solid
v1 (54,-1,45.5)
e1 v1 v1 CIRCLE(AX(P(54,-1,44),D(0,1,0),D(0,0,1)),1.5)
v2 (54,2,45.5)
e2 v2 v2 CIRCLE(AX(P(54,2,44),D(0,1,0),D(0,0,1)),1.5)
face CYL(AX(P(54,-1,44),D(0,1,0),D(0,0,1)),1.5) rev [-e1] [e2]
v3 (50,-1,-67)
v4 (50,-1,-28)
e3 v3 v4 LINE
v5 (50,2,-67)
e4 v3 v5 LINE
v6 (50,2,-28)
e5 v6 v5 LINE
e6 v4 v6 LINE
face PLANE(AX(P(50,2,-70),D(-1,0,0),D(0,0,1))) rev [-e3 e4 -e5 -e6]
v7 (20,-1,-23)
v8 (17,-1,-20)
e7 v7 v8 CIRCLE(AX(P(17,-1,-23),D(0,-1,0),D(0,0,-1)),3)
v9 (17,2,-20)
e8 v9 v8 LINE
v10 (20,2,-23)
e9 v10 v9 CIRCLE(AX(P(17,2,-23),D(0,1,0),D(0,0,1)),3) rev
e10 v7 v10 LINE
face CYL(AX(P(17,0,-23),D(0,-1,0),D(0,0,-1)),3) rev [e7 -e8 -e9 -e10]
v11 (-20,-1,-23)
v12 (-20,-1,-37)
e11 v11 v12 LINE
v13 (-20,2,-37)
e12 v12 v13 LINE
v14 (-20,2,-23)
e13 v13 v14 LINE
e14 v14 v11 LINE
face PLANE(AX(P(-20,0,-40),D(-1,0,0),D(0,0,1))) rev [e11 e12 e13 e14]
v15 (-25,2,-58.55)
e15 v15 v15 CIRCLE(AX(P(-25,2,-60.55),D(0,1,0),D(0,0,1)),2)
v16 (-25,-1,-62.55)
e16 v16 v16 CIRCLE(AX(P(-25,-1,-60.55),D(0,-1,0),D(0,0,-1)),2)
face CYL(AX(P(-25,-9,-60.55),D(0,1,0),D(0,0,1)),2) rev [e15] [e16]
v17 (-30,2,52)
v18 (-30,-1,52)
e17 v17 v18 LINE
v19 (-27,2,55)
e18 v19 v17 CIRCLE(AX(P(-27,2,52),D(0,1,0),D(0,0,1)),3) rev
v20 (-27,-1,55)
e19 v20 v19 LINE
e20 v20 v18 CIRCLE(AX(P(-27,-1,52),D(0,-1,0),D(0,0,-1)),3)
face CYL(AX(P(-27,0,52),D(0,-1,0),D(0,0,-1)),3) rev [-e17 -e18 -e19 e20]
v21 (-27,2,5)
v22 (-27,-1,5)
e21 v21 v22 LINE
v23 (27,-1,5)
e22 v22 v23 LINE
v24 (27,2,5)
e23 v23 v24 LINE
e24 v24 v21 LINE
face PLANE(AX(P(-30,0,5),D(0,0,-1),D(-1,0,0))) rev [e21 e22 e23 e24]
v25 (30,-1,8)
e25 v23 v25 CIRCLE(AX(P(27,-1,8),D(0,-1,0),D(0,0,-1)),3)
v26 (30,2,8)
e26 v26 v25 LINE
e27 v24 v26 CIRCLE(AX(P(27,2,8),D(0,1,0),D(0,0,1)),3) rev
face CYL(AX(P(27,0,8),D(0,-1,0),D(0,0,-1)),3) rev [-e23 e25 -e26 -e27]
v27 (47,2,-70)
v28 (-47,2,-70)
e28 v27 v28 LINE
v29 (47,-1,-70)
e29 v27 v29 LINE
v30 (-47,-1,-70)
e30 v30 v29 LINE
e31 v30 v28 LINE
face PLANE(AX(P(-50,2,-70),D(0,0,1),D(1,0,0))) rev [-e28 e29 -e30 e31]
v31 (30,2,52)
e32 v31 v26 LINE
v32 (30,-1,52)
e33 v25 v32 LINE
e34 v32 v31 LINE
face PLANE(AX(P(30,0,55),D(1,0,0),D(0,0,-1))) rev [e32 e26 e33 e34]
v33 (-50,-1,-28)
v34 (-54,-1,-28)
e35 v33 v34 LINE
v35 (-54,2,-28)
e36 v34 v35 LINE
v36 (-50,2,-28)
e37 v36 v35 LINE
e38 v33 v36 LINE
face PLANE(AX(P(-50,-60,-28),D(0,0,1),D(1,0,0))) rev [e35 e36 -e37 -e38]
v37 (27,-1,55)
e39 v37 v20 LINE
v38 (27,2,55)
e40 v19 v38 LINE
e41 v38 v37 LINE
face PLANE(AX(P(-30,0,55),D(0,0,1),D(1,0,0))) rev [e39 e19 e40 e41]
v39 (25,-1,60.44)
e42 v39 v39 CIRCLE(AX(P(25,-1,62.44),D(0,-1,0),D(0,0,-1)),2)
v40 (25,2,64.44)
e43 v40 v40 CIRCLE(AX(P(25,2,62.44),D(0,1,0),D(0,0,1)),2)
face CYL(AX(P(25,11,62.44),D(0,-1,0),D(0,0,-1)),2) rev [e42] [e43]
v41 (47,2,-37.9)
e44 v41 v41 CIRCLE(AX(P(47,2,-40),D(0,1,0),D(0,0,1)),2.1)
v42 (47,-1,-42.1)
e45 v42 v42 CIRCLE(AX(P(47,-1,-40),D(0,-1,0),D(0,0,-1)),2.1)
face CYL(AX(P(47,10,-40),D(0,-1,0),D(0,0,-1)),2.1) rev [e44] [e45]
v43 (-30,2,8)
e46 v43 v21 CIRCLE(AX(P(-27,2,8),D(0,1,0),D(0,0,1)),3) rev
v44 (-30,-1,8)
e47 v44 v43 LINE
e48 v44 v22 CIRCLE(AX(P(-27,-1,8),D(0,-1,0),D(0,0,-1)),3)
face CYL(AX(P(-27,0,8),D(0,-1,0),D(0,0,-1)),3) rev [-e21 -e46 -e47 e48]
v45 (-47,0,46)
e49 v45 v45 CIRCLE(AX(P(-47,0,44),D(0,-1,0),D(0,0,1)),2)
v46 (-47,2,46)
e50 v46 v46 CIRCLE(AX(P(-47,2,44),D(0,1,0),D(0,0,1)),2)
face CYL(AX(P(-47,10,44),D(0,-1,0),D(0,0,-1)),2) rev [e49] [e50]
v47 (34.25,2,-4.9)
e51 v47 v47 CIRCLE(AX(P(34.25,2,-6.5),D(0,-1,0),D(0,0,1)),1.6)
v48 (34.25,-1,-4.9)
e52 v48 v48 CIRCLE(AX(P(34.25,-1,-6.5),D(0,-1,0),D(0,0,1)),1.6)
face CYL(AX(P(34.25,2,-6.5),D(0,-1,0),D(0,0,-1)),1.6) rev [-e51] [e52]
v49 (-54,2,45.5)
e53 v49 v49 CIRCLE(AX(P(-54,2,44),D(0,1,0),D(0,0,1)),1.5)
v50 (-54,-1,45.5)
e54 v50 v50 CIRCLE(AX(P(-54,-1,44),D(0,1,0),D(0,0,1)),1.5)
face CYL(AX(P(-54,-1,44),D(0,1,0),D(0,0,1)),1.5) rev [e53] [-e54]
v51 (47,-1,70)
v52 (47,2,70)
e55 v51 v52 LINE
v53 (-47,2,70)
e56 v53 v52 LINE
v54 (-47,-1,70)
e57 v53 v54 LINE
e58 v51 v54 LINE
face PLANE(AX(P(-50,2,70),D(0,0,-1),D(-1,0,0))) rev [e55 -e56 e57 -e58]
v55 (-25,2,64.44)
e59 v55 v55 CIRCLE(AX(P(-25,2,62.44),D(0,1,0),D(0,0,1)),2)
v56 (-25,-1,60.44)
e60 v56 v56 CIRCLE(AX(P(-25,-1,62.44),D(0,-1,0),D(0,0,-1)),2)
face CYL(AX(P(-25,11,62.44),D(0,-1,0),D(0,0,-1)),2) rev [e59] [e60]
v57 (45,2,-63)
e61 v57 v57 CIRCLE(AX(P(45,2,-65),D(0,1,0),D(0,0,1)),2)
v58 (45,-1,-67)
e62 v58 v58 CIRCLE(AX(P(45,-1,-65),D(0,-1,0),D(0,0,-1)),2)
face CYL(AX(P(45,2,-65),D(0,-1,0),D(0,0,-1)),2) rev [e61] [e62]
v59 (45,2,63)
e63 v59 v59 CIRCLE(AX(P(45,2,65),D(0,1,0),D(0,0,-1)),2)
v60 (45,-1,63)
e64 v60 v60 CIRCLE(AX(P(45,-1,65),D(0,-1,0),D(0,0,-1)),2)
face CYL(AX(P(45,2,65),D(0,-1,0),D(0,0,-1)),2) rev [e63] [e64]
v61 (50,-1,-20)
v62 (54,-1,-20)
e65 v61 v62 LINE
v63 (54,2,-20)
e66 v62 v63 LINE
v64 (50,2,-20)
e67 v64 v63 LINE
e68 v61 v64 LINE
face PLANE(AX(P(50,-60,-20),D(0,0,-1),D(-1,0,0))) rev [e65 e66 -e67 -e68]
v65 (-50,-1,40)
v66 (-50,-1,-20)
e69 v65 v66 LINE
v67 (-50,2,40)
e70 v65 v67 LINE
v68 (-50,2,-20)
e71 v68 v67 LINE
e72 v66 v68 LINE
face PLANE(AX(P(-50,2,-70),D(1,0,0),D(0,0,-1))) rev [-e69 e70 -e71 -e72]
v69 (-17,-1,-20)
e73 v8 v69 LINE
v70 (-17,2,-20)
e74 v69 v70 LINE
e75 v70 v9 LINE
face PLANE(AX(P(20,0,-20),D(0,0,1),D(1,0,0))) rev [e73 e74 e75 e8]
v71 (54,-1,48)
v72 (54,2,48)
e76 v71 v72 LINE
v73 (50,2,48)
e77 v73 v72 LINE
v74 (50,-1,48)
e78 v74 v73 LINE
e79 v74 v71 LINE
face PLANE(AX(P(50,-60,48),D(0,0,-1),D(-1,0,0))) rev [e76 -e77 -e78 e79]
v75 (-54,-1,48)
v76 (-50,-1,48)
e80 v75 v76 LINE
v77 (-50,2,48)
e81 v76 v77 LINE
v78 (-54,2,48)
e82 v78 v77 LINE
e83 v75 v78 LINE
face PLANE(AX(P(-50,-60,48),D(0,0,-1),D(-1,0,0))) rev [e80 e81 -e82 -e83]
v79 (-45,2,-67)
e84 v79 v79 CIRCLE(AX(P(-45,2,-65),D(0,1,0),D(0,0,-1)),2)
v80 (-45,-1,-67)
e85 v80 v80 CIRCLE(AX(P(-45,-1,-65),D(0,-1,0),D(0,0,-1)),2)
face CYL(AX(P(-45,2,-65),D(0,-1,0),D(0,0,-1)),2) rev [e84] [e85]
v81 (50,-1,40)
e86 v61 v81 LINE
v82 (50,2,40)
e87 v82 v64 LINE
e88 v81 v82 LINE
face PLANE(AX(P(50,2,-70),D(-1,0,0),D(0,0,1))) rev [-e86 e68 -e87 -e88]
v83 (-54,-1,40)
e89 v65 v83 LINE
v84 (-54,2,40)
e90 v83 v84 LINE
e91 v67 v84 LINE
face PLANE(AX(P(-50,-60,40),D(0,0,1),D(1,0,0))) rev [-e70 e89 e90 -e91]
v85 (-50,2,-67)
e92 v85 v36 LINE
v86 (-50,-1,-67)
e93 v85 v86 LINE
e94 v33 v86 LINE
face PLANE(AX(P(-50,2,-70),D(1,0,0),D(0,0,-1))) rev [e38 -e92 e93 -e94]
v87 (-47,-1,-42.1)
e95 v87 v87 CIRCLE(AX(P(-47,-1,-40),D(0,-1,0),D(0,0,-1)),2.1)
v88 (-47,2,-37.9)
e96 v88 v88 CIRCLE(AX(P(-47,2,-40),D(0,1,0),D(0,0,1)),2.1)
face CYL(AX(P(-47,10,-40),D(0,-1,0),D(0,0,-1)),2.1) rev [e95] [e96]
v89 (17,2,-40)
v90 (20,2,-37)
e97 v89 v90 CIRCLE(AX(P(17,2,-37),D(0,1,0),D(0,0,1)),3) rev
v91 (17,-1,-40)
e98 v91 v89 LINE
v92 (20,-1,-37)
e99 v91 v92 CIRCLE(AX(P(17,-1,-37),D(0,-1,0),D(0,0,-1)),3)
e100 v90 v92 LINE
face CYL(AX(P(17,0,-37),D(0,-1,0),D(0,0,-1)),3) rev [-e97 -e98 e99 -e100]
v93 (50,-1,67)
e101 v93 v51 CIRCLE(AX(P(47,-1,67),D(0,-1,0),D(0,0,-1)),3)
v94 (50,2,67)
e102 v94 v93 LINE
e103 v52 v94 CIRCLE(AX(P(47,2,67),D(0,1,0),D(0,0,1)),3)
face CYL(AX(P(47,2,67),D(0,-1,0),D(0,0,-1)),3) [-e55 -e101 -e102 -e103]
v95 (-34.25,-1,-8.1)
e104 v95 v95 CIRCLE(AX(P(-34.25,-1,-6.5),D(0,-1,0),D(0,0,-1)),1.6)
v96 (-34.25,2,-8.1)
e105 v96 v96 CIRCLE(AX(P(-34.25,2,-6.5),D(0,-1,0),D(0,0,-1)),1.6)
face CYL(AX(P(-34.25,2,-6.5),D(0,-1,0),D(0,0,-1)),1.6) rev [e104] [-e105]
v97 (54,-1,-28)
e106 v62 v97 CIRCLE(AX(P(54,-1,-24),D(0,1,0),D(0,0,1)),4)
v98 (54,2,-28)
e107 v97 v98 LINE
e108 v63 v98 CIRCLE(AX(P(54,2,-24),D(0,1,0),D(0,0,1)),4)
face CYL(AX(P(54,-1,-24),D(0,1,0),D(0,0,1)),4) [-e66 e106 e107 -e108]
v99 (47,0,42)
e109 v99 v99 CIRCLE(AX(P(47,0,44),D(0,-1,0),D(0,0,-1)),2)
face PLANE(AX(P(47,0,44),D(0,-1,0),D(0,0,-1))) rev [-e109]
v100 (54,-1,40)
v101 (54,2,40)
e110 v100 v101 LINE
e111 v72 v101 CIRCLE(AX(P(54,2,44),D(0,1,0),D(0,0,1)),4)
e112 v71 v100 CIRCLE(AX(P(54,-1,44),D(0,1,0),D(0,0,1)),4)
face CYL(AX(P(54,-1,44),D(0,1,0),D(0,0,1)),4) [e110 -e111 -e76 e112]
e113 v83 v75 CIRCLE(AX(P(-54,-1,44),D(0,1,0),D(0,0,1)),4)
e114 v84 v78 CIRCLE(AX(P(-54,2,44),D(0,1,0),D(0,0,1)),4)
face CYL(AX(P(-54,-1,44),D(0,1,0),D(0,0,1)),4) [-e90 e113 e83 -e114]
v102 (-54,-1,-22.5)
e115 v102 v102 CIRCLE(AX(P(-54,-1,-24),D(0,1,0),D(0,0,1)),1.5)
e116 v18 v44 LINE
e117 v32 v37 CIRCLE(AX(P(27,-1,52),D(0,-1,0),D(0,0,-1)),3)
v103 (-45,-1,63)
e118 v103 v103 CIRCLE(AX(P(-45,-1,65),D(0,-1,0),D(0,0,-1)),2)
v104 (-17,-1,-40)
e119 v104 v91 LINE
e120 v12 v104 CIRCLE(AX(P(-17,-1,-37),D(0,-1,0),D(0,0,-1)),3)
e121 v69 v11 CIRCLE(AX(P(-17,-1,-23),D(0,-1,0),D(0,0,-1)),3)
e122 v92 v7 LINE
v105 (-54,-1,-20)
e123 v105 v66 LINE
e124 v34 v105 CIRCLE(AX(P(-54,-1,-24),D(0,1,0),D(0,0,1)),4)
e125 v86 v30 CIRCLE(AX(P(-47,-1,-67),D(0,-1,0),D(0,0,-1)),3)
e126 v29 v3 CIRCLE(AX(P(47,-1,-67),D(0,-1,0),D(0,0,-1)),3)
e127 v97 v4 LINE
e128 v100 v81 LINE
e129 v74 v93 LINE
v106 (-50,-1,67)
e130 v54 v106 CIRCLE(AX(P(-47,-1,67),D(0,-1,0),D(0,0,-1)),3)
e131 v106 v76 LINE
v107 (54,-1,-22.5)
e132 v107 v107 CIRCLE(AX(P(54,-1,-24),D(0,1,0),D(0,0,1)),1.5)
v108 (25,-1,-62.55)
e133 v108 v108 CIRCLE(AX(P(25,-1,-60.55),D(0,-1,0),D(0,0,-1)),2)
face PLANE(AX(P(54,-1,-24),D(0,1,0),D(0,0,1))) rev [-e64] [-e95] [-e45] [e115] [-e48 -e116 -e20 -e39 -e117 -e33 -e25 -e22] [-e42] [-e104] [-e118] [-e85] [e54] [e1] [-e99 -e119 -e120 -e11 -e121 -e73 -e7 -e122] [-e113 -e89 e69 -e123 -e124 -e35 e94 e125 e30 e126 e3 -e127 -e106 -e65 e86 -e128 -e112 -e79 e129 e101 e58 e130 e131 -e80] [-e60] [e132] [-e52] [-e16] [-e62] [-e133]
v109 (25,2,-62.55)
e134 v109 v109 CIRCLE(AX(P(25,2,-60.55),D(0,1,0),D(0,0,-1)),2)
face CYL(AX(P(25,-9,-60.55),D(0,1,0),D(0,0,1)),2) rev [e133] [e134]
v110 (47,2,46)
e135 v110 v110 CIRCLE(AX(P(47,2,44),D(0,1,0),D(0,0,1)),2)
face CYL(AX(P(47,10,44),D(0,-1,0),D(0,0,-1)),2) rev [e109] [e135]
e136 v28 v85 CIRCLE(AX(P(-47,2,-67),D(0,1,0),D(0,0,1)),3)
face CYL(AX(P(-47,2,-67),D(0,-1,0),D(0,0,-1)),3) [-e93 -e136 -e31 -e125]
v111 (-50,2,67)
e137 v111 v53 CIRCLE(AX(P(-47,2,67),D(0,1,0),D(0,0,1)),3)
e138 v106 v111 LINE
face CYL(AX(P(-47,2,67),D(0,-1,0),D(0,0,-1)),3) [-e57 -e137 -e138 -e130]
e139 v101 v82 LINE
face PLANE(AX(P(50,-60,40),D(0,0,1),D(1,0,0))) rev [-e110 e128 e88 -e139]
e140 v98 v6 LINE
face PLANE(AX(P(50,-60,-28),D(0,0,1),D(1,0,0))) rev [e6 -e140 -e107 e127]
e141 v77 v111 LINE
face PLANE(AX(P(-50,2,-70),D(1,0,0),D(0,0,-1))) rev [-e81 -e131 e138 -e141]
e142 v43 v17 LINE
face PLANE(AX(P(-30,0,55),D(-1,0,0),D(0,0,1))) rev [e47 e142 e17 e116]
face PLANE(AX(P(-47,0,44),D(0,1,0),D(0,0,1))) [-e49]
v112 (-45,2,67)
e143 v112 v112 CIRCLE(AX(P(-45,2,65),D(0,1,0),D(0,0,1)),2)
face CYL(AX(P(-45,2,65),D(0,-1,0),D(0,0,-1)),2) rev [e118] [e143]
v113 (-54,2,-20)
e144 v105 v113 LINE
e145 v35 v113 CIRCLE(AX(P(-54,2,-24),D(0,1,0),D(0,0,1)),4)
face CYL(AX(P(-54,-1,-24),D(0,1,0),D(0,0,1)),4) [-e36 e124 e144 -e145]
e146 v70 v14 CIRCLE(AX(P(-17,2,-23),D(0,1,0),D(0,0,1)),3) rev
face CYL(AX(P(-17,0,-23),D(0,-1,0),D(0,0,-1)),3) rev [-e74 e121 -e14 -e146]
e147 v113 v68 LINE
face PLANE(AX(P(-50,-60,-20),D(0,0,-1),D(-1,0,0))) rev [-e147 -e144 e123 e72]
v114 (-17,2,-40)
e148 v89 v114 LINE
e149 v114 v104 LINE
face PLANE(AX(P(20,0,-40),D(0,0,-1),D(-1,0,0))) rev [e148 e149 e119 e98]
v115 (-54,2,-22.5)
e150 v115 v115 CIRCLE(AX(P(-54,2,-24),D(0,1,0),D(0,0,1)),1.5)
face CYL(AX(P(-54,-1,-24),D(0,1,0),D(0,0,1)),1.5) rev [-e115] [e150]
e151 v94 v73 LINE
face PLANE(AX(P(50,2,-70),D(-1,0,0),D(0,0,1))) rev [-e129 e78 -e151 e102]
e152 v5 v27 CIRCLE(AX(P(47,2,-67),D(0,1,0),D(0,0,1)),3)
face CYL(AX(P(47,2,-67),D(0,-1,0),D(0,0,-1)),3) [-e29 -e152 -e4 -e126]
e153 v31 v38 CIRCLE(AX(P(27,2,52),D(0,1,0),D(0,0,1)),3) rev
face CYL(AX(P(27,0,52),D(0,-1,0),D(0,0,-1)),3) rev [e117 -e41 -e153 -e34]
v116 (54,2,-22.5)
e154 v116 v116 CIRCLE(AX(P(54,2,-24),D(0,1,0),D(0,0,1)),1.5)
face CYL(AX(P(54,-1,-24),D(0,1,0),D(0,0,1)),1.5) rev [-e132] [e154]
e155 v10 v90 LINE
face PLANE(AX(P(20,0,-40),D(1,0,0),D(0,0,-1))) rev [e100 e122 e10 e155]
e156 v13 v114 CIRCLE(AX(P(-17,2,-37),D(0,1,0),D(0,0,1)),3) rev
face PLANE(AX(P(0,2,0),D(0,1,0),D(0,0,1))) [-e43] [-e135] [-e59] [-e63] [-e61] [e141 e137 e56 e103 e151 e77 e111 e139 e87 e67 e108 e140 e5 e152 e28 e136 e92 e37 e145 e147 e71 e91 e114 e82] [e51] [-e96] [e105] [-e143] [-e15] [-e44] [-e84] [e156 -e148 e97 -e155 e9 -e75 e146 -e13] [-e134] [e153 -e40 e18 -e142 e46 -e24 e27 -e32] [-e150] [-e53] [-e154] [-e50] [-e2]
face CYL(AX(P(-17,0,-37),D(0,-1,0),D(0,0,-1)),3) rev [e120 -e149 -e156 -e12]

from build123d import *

# Parameters (mm, degrees)
SKETCH1_W                = 100
SKETCH1_H                = 140
SKETCH1_R                = 2
EXTRUDE1_DEPTH           = 2
SKETCH2_W                = 60
SKETCH2_H                = 50
EXTRUDE2_DEPTH           = 87.046499057
SKETCH3_W                = 40
SKETCH3_H                = 20
EXTRUDE3_DEPTH           = 87.046499057
FILLET1_R                = 3
SKETCH4_W                = 6
SKETCH4_H                = 8
EXTRUDE4_DEPTH           = 60
SKETCH5_R                = 1
EXTRUDE5_DEPTH           = 8
SKETCH6_R                = 2
SKETCH6_R_2              = 2.1
EXTRUDE6_DEPTH           = 10
EXTRUDE_START            = -3
SKETCH_3_R               = 1.5
EXTRUDE_1_DEPTH          = 3
CUT_EXTRUDE_3_DEPTH      = 29
CUT_EXTRUDE_3_DEPTH_BACK = 134
SKETCH_4_W               = 103.957976386
SKETCH_4_H               = 74.150098407
SKETCH_6_R               = 2
CUT_EXTRUDE_4_DEPTH      = 11
SKETCH_8_R               = 2
CUT_EXTRUDE_6_DEPTH      = 11
EXTRUDE_START_2          = 1
SKETCH_9_R               = 2
SKETCH_9_R_2             = 2.1
EXTRUDE_2_DEPTH          = 1
SKETCH_10_R              = 1.6
CUT_EXTRUDE_7_DEPTH      = 3


with BuildPart() as part:
    # Sketch1 → Extrude1 (new body)
    with BuildSketch(Plane(origin=(0, 0, 0), x_dir=(1, 0, 0), z_dir=(0, 1, 0))):
        Rectangle(SKETCH1_W, SKETCH1_H)
        with Locations((45, 65)):
            Circle(SKETCH1_R, mode=Mode.SUBTRACT)
        with Locations((-45, 65)):
            Circle(SKETCH1_R, mode=Mode.SUBTRACT)
        with Locations((-45, -65)):
            Circle(SKETCH1_R, mode=Mode.SUBTRACT)
        with Locations((45, -65)):
            Circle(SKETCH1_R, mode=Mode.SUBTRACT)
    extrude(amount=EXTRUDE1_DEPTH)

    # Sketch2 → Extrude2 (cut, through all)
    with BuildSketch(Plane(origin=(0, 2, 0), x_dir=(1, 0, 0), z_dir=(0, 1, 0))):
        with Locations((0, -30)):
            Rectangle(SKETCH2_W, SKETCH2_H)
    extrude(amount=-EXTRUDE2_DEPTH, mode=Mode.SUBTRACT)

    # Sketch3 → Extrude3 (cut, through all)
    with BuildSketch(Plane(origin=(0, 2, 0), x_dir=(1, 0, 0), z_dir=(0, 1, 0))):
        with Locations((0, 30)):
            Rectangle(SKETCH3_W, SKETCH3_H)
    extrude(amount=-EXTRUDE3_DEPTH, mode=Mode.SUBTRACT)

    # Fillet1
    fillet1_edges = [part.edges().sort_by_distance(p)[0] for p in [
        (50, 1, 70),
        (-50, 1, 70),
        (-50, 1, -70),
        (30, 1, 5),
        (-30, 1, 5),
        (-30, 1, 55),
        (30, 1, 55),
        (-20, 1, -20),
        (20, 1, -20),
        (20, 1, -40),
        (-20, 1, -40),
        (50, 1, -70),
    ]]
    fillet(fillet1_edges, radius=FILLET1_R)

    # Sketch4 → Extrude4 (add)
    with BuildSketch(Plane.XZ):
        with Locations((47, 44)):
            Rectangle(SKETCH4_W, SKETCH4_H)
        with Locations((47, -24)):
            Rectangle(SKETCH4_W, SKETCH4_H)
        with Locations((-47, -24)):
            Rectangle(SKETCH4_W, SKETCH4_H)
        with Locations((-47, 44)):
            Rectangle(SKETCH4_W, SKETCH4_H)
    extrude(amount=EXTRUDE4_DEPTH)

    # Sketch5 → Extrude5 (add)
    # profile 1 of 4: a face of its own
    with BuildSketch(Plane.XZ.offset(60)):
        with BuildLine():
            Line((44, 40), (44, 48))
            Line((44, 48), (54, 48))
            ThreePointArc((54, 48), (58, 44), (54, 40))
            Line((54, 40), (44, 40))
        make_face()
        with Locations((54, 44)):
            Circle(SKETCH5_R, mode=Mode.SUBTRACT)
    # profile 2 of 4: a face of its own
    with BuildSketch(Plane.XZ.offset(60)):
        with BuildLine():
            Line((44, -28), (44, -20))
            Line((44, -20), (54, -20))
            ThreePointArc((54, -20), (58, -24), (54, -28))
            Line((54, -28), (44, -28))
        make_face()
        with Locations((54, -24)):
            Circle(SKETCH5_R, mode=Mode.SUBTRACT)
    # profile 3 of 4: a face of its own
    with BuildSketch(Plane.XZ.offset(60)):
        with BuildLine():
            Line((-44, -20), (-54, -20))
            ThreePointArc((-54, -20), (-58, -24), (-54, -28))
            Line((-54, -28), (-44, -28))
            Line((-44, -28), (-44, -20))
        make_face()
        with Locations((-54, -24)):
            Circle(SKETCH5_R, mode=Mode.SUBTRACT)
    # profile 4 of 4: a face of its own
    with BuildSketch(Plane.XZ.offset(60)):
        with BuildLine():
            Line((-44, 48), (-54, 48))
            ThreePointArc((-54, 48), (-58, 44), (-54, 40))
            Line((-54, 40), (-44, 40))
            Line((-44, 40), (-44, 48))
        make_face()
        with Locations((-54, 44)):
            Circle(SKETCH5_R, mode=Mode.SUBTRACT)
    extrude(amount=-EXTRUDE5_DEPTH)

    # Sketch6 → Extrude6 (cut)
    with BuildSketch(Plane(origin=(0, 0, 0), x_dir=(-1, 0, 0), z_dir=(0, -1, 0))):
        with Locations((-47, -44)):
            Circle(SKETCH6_R)
        with Locations((-47, 40)):
            Circle(SKETCH6_R_2)
        with Locations((47, 40)):
            Circle(SKETCH6_R_2)
        with Locations((47, -44)):
            Circle(SKETCH6_R)
    extrude(amount=-EXTRUDE6_DEPTH, mode=Mode.SUBTRACT)

    # 草图3 → 凸台-拉伸1 (add)
    # profile 1 of 4: a face of its own
    with BuildSketch(Plane(origin=(0, 2, 0), x_dir=(1, 0, 0), z_dir=(0, 1, 0)).offset(EXTRUDE_START)):
        with BuildLine():
            Line((50, 28), (50, 20))
            Line((50, 20), (54, 20))
            ThreePointArc((54, 20), (58, 24), (54, 28))
            Line((54, 28), (50, 28))
        make_face()
        with Locations((54, 24)):
            Circle(SKETCH_3_R, mode=Mode.SUBTRACT)
    # profile 2 of 4: a face of its own
    with BuildSketch(Plane(origin=(0, 2, 0), x_dir=(1, 0, 0), z_dir=(0, 1, 0)).offset(EXTRUDE_START)):
        with BuildLine():
            Line((50, -40), (50, -48))
            Line((50, -48), (54, -48))
            ThreePointArc((54, -48), (58, -44), (54, -40))
            Line((54, -40), (50, -40))
        make_face()
        with Locations((54, -44)):
            Circle(SKETCH_3_R, mode=Mode.SUBTRACT)
    # profile 3 of 4: a face of its own
    with BuildSketch(Plane(origin=(0, 2, 0), x_dir=(1, 0, 0), z_dir=(0, 1, 0)).offset(EXTRUDE_START)):
        with BuildLine():
            Line((-54, -48), (-50, -48))
            Line((-50, -48), (-50, -40))
            Line((-50, -40), (-54, -40))
            ThreePointArc((-54, -40), (-58, -44), (-54, -48))
        make_face()
        with Locations((-54, -44)):
            Circle(SKETCH_3_R, mode=Mode.SUBTRACT)
    # profile 4 of 4: a face of its own
    with BuildSketch(Plane(origin=(0, 2, 0), x_dir=(1, 0, 0), z_dir=(0, 1, 0)).offset(EXTRUDE_START)):
        with BuildLine():
            Line((-50, 20), (-50, 28))
            Line((-50, 28), (-54, 28))
            ThreePointArc((-54, 28), (-58, 24), (-54, 20))
            Line((-54, 20), (-50, 20))
        make_face()
        with Locations((-54, 24)):
            Circle(SKETCH_3_R, mode=Mode.SUBTRACT)
    extrude(amount=EXTRUDE_1_DEPTH)

    # 草图4 → 切除-拉伸3 (cut, two sides: drawn at the far end of the back side and taken through both)
    with BuildSketch(Plane(origin=(50, 0, 0), x_dir=(0, 0, -1), z_dir=(1, 0, 0)).offset(-CUT_EXTRUDE_3_DEPTH_BACK)):
        with Locations((3.978988193, -38.075049204)):
            Rectangle(SKETCH_4_W, SKETCH_4_H)
    extrude(amount=CUT_EXTRUDE_3_DEPTH + CUT_EXTRUDE_3_DEPTH_BACK, mode=Mode.SUBTRACT)

    # 草图6 → 切除-拉伸4 (cut)
    with BuildSketch(Plane(origin=(0, 2, 0), x_dir=(1, 0, 0), z_dir=(0, 1, 0))):
        with Locations((-25, 60.55)):
            Circle(SKETCH_6_R)
        with Locations((25, 60.55)):
            Circle(SKETCH_6_R)
    extrude(amount=-CUT_EXTRUDE_4_DEPTH, mode=Mode.SUBTRACT)

    # 草图8 → 切除-拉伸6 (cut)
    with BuildSketch(Plane(origin=(0, 0, 0), x_dir=(-1, 0, 0), z_dir=(0, -1, 0))):
        with Locations((25, -62.44)):
            Circle(SKETCH_8_R)
        with Locations((-25, -62.44)):
            Circle(SKETCH_8_R)
    extrude(amount=-CUT_EXTRUDE_6_DEPTH, mode=Mode.SUBTRACT)

    # 草图9 → 凸台-拉伸2 (add)
    with BuildSketch(Plane.XZ.offset(EXTRUDE_START_2)):
        with BuildLine():
            Line((-44, 40), (-50, 40))
            Line((-50, 40), (-50, -20))
            Line((-50, -20), (-44, -20))
            Line((-44, -20), (-44, -28))
            Line((-44, -28), (-50, -28))
            Line((-50, -28), (-50, -67))
            ThreePointArc((-50, -67), (-49.121320344, -69.121320344), (-47, -70))
            Line((-47, -70), (47, -70))
            ThreePointArc((47, -70), (49.121320344, -69.121320344), (50, -67))
            Line((50, -67), (50, -28))
            Line((50, -28), (44, -28))
            Line((44, -28), (44, -20))
            Line((44, -20), (50, -20))
            Line((50, -20), (50, 40))
            Line((50, 40), (44, 40))
            Line((44, 40), (44, 48))
            Line((44, 48), (50, 48))
            Line((50, 48), (50, 67))
            ThreePointArc((50, 67), (49.121320344, 69.121320344), (47, 70))
            Line((47, 70), (-47, 70))
            ThreePointArc((-47, 70), (-49.121320344, 69.121320344), (-50, 67))
            Line((-50, 67), (-50, 48))
            Line((-50, 48), (-44, 48))
            Line((-44, 48), (-44, 40))
        make_face()
        with Locations((-45, 65)):
            Circle(SKETCH_9_R, mode=Mode.SUBTRACT)
        with Locations((-25, 62.44)):
            Circle(SKETCH_9_R, mode=Mode.SUBTRACT)
        with Locations((45, 65)):
            Circle(SKETCH_9_R, mode=Mode.SUBTRACT)
        with Locations((25, 62.44)):
            Circle(SKETCH_9_R, mode=Mode.SUBTRACT)
        with Locations((47, -40)):
            Circle(SKETCH_9_R_2, mode=Mode.SUBTRACT)
        with Locations((45, -65)):
            Circle(SKETCH_9_R, mode=Mode.SUBTRACT)
        with Locations((25, -60.55)):
            Circle(SKETCH_9_R, mode=Mode.SUBTRACT)
        with Locations((-45, -65)):
            Circle(SKETCH_9_R, mode=Mode.SUBTRACT)
        with Locations((-47, -40)):
            Circle(SKETCH_9_R_2, mode=Mode.SUBTRACT)
        with Locations((-25, -60.55)):
            Circle(SKETCH_9_R, mode=Mode.SUBTRACT)
        with BuildLine():
            Line((30, 52), (30, 8))
            ThreePointArc((30, 8), (29.121320344, 5.878679656), (27, 5))
            Line((27, 5), (-27, 5))
            ThreePointArc((-27, 5), (-29.121320344, 5.878679656), (-30, 8))
            Line((-30, 8), (-30, 52))
            ThreePointArc((-30, 52), (-29.121320344, 54.121320344), (-27, 55))
            Line((-27, 55), (27, 55))
            ThreePointArc((27, 55), (29.121320344, 54.121320344), (30, 52))
        make_face(mode=Mode.SUBTRACT)
        with BuildLine():
            Line((20, -23), (20, -37))
            ThreePointArc((20, -37), (19.121320344, -39.121320344), (17, -40))
            Line((17, -40), (-17, -40))
            ThreePointArc((-17, -40), (-19.121320344, -39.121320344), (-20, -37))
            Line((-20, -37), (-20, -23))
            ThreePointArc((-20, -23), (-19.121320344, -20.878679656), (-17, -20))
            Line((-17, -20), (17, -20))
            ThreePointArc((17, -20), (19.121320344, -20.878679656), (20, -23))
        make_face(mode=Mode.SUBTRACT)
    extrude(amount=-EXTRUDE_2_DEPTH)

    # 草图10 → 切除-拉伸7 (cut)
    with BuildSketch(Plane(origin=(0, -1, 0), x_dir=(-1, 0, 0), z_dir=(0, -1, 0))):
        with Locations((34.25, 6.5)):
            Circle(SKETCH_10_R)
        with Locations((-34.25, 6.5)):
            Circle(SKETCH_10_R)
    extrude(amount=-CUT_EXTRUDE_7_DEPTH, mode=Mode.SUBTRACT)


solid = part.part
